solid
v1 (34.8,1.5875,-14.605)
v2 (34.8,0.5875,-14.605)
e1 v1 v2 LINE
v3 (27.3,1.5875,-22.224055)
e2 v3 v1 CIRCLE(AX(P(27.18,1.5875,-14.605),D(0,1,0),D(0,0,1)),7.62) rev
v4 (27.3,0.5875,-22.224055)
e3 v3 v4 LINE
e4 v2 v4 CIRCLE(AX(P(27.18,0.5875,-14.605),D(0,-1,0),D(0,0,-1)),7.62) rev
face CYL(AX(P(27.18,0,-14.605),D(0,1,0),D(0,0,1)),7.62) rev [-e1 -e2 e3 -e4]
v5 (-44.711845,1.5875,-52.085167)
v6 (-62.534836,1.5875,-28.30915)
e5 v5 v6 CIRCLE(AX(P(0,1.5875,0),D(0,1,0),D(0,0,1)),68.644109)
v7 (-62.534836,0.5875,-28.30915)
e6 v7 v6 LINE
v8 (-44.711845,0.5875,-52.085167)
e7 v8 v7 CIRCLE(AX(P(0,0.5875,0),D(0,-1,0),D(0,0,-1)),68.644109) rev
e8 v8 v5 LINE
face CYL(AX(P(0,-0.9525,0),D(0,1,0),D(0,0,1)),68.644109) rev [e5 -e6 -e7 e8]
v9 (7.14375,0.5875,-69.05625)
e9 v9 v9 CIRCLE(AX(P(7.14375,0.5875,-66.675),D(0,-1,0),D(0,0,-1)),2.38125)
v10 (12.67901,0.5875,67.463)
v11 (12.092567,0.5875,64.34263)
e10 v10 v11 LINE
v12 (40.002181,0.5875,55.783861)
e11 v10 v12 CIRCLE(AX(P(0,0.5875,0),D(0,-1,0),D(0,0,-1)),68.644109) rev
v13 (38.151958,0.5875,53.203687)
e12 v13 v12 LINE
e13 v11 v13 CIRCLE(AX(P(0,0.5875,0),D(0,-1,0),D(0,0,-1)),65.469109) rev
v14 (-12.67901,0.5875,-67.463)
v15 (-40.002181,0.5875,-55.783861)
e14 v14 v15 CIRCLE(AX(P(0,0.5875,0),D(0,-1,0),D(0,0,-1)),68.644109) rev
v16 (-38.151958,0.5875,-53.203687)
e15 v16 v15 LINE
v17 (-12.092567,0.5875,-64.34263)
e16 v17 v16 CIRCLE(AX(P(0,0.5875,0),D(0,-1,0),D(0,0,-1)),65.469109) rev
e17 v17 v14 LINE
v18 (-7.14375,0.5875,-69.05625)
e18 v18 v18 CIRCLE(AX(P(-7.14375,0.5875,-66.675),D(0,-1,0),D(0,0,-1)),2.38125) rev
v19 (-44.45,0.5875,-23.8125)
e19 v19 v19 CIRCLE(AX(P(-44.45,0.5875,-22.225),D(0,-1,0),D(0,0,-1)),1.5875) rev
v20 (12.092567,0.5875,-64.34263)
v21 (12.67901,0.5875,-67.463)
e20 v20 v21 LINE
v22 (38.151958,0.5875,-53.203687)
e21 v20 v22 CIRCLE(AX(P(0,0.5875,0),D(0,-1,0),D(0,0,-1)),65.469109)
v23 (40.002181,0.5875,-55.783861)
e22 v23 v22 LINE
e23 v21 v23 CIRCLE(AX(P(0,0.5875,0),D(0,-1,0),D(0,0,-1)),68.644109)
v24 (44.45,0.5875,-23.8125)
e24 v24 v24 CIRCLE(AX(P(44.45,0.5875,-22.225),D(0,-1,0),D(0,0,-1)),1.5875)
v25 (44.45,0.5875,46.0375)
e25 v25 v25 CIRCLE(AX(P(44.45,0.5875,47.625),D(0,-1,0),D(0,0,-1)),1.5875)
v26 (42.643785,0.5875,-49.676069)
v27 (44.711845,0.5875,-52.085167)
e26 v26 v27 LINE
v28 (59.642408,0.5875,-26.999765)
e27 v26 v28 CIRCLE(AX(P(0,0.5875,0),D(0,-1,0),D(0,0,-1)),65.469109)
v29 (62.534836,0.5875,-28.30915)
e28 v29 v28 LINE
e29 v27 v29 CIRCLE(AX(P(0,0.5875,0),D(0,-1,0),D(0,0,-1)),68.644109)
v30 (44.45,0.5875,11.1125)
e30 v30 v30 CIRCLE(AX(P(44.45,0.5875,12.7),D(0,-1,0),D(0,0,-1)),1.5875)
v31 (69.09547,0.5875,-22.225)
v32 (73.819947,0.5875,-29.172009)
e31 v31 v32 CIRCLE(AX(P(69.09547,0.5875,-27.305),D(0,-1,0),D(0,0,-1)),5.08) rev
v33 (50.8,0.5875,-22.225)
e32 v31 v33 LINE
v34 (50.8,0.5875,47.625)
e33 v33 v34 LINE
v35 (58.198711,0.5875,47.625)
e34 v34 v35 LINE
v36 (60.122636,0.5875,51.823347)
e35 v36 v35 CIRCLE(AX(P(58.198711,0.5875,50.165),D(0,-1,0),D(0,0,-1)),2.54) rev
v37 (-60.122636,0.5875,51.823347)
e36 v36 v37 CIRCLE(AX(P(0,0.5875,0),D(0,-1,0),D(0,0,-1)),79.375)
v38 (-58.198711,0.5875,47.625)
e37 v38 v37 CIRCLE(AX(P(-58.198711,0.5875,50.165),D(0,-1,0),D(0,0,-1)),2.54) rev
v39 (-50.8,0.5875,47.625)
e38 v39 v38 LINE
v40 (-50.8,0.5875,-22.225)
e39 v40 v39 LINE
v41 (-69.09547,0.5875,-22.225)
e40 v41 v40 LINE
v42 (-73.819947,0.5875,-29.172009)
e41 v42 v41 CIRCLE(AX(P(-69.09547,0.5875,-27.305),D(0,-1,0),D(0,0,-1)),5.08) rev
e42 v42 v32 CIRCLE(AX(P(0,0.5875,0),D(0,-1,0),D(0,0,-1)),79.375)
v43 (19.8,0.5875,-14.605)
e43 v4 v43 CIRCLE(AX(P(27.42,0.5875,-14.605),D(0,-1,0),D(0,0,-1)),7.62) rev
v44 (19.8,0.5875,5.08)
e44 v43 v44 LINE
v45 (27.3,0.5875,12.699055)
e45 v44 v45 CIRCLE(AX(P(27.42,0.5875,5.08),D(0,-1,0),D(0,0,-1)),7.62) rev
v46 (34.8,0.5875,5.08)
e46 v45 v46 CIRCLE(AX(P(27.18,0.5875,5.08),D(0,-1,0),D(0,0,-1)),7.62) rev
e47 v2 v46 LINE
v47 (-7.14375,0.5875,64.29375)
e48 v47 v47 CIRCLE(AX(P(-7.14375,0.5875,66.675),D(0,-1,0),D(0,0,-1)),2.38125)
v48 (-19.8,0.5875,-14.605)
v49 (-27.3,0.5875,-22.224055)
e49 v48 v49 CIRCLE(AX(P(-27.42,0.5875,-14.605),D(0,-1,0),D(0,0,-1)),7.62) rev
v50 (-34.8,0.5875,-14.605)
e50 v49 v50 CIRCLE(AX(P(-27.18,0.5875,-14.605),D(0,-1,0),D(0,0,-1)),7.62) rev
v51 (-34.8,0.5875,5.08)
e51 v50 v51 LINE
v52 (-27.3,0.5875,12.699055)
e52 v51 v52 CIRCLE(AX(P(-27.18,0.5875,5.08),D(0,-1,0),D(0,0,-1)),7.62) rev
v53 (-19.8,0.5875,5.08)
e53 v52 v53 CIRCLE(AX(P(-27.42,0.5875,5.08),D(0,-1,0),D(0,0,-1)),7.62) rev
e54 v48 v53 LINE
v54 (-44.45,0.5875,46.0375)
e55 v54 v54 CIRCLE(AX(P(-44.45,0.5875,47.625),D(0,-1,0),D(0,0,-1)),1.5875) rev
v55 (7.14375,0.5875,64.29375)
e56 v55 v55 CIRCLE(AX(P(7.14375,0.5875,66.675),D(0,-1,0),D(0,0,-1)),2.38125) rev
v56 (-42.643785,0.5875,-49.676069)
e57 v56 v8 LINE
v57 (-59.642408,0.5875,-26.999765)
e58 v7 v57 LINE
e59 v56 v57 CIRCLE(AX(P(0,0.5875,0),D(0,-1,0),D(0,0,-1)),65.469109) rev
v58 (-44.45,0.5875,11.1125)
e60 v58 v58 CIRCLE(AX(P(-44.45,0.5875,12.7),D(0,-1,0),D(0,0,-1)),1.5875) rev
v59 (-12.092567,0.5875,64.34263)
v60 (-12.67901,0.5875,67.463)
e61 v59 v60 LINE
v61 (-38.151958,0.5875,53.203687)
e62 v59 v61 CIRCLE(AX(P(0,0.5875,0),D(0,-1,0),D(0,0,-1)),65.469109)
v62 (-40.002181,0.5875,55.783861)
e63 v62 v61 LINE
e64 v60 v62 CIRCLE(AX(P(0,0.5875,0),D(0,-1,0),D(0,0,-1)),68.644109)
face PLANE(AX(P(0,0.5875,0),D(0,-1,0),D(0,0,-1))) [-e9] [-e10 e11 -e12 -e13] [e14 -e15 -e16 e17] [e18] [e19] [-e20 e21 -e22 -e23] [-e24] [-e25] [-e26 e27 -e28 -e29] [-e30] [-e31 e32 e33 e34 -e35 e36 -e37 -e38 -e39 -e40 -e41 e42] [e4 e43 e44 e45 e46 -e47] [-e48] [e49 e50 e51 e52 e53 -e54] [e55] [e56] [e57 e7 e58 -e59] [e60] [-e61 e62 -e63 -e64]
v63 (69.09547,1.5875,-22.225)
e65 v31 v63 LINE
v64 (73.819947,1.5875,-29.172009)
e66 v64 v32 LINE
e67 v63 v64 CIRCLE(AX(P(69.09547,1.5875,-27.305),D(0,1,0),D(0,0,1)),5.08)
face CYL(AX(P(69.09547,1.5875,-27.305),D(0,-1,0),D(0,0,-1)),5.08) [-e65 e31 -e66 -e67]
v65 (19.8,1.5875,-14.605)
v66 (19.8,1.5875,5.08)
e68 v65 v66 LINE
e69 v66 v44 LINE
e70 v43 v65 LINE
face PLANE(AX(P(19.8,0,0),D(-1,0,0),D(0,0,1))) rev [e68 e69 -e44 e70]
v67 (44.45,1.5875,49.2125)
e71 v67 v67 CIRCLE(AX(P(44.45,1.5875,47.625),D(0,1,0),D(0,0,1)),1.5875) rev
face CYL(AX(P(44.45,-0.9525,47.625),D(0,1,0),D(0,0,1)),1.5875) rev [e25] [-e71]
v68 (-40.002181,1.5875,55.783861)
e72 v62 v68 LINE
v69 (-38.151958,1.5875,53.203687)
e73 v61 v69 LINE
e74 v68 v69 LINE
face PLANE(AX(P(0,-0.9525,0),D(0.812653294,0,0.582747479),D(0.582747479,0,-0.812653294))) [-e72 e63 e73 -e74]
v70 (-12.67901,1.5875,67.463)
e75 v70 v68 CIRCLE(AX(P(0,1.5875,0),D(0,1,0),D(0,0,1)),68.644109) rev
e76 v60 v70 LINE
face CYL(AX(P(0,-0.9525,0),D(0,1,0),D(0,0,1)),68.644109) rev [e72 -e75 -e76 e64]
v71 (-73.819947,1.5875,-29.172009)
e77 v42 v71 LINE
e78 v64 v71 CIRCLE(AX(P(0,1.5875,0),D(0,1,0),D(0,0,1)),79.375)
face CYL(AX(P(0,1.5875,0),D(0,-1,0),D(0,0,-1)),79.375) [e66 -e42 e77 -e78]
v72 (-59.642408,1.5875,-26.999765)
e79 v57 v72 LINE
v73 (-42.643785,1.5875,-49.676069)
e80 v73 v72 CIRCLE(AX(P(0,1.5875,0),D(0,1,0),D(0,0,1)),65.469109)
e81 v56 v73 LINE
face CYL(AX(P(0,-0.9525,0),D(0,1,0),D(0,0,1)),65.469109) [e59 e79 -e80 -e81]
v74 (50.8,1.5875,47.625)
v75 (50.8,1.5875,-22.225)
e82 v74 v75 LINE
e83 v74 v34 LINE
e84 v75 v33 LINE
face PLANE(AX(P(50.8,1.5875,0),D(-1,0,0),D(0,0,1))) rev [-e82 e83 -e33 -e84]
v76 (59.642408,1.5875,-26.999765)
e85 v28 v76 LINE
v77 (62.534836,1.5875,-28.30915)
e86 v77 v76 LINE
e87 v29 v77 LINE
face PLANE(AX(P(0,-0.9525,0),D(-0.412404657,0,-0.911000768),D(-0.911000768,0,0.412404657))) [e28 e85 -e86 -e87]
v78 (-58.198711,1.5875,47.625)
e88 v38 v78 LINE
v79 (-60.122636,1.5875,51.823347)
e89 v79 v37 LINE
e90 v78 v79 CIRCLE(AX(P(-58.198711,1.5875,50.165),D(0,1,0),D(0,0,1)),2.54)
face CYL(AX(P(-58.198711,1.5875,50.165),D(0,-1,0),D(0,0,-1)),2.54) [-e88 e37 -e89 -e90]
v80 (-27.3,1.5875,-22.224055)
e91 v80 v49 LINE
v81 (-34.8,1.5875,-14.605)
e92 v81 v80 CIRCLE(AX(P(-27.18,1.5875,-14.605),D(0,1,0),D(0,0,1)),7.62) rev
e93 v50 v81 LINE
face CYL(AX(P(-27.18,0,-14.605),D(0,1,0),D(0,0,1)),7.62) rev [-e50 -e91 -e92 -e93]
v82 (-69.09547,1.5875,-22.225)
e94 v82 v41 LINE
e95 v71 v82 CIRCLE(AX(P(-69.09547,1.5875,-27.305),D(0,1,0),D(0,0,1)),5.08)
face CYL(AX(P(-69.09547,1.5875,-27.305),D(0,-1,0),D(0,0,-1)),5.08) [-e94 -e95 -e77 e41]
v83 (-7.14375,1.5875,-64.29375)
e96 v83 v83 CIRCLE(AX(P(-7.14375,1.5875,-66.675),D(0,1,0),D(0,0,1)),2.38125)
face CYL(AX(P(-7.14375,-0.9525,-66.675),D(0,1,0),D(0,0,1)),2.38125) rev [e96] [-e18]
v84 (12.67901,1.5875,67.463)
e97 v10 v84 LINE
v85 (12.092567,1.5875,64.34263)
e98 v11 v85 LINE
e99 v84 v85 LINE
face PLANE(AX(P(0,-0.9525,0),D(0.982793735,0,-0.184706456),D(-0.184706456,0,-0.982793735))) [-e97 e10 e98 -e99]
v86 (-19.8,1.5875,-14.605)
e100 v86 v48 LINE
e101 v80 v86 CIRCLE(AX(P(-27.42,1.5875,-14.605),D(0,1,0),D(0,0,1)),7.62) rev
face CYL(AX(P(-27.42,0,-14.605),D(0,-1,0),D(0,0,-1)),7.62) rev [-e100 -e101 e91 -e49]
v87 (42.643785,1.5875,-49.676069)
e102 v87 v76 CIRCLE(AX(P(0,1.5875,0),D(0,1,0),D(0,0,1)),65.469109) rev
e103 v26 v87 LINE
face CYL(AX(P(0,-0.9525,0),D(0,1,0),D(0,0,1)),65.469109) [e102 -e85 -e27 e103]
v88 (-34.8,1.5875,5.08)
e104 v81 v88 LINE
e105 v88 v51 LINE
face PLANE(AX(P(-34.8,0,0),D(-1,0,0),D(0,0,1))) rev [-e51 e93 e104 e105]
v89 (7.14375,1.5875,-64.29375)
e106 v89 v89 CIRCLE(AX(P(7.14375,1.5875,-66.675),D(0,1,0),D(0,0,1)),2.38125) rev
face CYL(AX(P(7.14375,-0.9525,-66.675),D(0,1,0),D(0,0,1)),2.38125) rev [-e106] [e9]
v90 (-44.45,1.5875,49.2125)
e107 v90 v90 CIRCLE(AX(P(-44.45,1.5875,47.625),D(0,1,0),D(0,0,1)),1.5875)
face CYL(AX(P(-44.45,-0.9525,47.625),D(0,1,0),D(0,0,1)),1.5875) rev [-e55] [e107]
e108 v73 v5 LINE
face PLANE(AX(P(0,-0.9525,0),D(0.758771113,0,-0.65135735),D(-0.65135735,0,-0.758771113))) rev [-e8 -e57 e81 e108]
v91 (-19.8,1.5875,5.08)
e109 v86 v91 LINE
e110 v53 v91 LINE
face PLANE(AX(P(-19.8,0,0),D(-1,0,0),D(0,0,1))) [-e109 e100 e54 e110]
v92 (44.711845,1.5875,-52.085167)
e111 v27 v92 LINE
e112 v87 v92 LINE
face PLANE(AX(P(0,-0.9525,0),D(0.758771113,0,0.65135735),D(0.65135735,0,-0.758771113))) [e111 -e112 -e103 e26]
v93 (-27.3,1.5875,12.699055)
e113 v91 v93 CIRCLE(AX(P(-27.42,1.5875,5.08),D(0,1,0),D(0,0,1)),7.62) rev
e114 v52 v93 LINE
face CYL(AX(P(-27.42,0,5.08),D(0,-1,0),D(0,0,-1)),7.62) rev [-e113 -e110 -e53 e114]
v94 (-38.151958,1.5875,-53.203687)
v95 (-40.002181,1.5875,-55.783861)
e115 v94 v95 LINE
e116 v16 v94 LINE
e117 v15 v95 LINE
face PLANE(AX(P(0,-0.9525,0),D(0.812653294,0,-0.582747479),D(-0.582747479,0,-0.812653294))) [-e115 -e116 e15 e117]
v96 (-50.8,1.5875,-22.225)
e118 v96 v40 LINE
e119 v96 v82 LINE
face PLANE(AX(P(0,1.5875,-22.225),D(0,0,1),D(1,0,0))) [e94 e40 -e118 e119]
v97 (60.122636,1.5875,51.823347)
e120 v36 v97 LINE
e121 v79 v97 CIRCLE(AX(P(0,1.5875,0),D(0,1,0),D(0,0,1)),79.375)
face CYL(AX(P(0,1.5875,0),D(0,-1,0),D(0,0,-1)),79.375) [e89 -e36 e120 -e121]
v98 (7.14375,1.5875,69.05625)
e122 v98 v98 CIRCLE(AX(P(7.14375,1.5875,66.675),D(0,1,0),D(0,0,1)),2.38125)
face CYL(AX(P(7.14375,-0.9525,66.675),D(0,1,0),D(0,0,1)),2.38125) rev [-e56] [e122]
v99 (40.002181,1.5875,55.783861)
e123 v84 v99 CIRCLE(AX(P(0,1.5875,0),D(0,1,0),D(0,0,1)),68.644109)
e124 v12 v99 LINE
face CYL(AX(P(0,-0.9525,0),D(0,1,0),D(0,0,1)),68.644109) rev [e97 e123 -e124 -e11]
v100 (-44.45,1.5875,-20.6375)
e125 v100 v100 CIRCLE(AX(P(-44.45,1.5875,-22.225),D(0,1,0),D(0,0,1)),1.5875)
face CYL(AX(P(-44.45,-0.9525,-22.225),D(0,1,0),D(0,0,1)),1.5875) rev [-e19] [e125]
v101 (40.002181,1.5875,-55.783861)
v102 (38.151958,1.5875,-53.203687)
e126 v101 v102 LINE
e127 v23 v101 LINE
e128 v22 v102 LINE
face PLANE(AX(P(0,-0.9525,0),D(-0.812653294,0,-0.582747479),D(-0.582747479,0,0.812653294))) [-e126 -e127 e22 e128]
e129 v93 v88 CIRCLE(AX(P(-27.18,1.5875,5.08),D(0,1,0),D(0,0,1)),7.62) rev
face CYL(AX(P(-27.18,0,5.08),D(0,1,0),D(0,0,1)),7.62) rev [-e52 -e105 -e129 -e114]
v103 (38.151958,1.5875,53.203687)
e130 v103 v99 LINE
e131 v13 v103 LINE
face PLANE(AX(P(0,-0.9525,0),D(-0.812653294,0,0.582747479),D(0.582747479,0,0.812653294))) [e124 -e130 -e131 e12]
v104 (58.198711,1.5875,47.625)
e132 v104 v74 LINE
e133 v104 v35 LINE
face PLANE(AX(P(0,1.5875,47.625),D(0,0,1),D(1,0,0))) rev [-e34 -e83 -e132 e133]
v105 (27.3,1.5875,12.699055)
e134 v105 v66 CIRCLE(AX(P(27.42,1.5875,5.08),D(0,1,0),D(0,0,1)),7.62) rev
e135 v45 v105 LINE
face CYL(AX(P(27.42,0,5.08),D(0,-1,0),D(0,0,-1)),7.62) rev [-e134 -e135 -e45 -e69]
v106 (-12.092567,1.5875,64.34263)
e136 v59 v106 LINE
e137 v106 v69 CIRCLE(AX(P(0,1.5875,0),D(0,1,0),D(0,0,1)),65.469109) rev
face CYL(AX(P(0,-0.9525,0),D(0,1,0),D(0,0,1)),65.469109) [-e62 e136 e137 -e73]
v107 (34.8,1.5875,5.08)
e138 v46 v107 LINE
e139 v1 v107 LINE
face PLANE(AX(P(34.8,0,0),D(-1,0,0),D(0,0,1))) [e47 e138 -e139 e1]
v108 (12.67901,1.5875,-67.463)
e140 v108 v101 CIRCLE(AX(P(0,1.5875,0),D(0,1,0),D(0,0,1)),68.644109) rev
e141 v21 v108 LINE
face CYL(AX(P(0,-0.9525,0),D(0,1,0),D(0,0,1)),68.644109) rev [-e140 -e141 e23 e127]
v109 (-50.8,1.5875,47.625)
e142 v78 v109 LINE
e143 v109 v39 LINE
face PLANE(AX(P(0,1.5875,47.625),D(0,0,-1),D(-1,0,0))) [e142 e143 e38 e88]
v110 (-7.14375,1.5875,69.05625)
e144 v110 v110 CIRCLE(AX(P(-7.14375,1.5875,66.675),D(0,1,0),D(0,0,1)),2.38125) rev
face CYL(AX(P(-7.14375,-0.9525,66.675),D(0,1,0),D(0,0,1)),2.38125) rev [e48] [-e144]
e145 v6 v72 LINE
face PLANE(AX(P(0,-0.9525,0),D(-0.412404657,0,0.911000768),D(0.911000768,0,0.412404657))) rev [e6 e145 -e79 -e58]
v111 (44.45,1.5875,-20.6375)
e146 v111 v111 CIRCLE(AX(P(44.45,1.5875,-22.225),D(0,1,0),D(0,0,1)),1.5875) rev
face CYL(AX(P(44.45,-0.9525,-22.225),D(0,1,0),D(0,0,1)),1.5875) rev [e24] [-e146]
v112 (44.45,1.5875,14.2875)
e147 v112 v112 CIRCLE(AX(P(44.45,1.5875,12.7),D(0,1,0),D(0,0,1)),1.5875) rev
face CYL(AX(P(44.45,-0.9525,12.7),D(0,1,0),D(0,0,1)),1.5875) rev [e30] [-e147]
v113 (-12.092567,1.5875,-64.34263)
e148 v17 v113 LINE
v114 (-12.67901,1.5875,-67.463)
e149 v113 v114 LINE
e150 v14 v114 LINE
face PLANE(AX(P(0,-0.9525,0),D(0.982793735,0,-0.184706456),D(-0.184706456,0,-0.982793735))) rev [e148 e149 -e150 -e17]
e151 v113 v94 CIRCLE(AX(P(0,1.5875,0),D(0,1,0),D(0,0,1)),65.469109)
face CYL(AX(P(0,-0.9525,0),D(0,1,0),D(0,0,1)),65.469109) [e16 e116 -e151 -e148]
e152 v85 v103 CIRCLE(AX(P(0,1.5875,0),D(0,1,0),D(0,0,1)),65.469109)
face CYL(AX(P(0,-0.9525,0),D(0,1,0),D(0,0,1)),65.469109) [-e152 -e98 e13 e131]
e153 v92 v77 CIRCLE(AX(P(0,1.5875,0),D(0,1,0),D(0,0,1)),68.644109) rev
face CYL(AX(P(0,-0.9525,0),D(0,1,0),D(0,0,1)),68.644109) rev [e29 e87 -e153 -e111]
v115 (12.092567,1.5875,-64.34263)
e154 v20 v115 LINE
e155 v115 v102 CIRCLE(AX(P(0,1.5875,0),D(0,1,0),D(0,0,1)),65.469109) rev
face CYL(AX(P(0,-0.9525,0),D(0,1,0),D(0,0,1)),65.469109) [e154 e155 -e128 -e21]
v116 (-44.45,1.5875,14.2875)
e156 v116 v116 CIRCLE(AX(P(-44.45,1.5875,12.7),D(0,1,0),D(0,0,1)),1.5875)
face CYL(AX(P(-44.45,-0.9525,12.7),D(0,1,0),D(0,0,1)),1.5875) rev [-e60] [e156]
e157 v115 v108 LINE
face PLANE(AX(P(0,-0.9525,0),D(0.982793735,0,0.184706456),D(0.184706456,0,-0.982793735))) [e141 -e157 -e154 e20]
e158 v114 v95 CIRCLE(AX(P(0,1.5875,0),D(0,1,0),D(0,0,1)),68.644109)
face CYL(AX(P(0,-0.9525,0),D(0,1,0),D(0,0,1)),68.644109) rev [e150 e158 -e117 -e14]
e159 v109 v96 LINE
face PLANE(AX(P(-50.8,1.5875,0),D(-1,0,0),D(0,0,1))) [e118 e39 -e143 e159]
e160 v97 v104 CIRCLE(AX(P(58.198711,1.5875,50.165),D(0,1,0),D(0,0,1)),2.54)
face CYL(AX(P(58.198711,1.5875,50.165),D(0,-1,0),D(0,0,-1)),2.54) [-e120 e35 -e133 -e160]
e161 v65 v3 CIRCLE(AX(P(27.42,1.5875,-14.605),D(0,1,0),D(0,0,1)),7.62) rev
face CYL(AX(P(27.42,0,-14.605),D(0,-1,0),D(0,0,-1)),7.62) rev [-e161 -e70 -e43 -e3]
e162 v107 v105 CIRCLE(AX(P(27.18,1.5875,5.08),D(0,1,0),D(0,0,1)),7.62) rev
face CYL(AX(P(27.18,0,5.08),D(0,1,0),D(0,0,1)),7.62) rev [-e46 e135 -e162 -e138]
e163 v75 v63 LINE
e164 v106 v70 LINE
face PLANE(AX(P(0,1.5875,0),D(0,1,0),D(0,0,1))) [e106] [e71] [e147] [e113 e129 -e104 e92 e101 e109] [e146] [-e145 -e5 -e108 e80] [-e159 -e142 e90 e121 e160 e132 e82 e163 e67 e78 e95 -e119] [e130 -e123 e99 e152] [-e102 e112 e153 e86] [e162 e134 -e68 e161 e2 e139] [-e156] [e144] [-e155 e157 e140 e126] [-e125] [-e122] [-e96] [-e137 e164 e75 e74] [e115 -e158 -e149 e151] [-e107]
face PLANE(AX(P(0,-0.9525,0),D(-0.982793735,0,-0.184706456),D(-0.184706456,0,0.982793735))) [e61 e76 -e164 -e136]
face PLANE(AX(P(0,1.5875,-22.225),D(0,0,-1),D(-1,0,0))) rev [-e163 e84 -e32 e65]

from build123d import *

# Parameters (mm, degrees)
SKETCH1_R           = 1.5875
BOSS_EXTRUDE5_DEPTH = 1.5875
FILLET2_R           = 2.54
FILLET3_R           = 2.54
FILLET4_R           = 5.08
CUT_EXTRUDE1_START  = -2.54
SKETCH2_R           = 2.38125
SKETCH2_R_2         = 1.5875
CUT_EXTRUDE1_DEPTH  = 2.54
SKETCH3_R           = 1.5875
CUT_EXTRUDE2_DEPTH  = 2.54
CUT_EXTRUDE3_DEPTH  = 2.54
SKETCH5_W           = 15
SKETCH5_H           = 34.925
CUT_EXTRUDE4_DEPTH  = 109.650407999
FILLET5_R           = 7.62
FILLET6_R           = 7.62
SKETCH6_R           = 79.375
CUT_EXTRUDE5_DEPTH  = 0.5875


with BuildPart() as part:
    # Sketch1 → Boss-Extrude5 (new body)
    with BuildSketch(Plane(origin=(0, 0, 0), x_dir=(1, 0, 0), z_dir=(0, 1, 0))):
        with BuildLine():
            ThreePointArc((-63.5, -47.625), (-35.497579143, -70.995158286), (0, -79.375))
            ThreePointArc((0, -79.375), (35.497579143, -70.995158286), (63.5, -47.625))
            Line((63.5, -47.625), (50.8, -47.625))
            Line((50.8, -47.625), (50.8, 22.225))
            Line((50.8, 22.225), (76.2, 22.225))
            ThreePointArc((76.2, 22.225), (0, 79.375), (-76.2, 22.225))
            Line((-76.2, 22.225), (-50.8, 22.225))
            Line((-50.8, 22.225), (-50.8, -47.625))
            Line((-50.8, -47.625), (-63.5, -47.625))
        make_face()
        with Locations(Location((-7.14375, -66.675, 0), (0, 0, 270))):
            Circle(SKETCH1_R, mode=Mode.SUBTRACT)
        with BuildLine():
            ThreePointArc((8.73125, -66.675), (7.14375, -68.2625), (5.55625, -66.675))
            ThreePointArc((5.55625, -66.675), (7.14375, -65.0875), (8.73125, -66.675))
        make_face(mode=Mode.SUBTRACT)
        with Locations(Location((-7.14375, 66.675, 0), (0, 0, 270))):
            Circle(SKETCH1_R, mode=Mode.SUBTRACT)
        with Locations(Location((7.14375, 66.675, 0), (0, 0, 270))):
            Circle(SKETCH1_R, mode=Mode.SUBTRACT)
    extrude(amount=BOSS_EXTRUDE5_DEPTH)

    # Fillet2
    fillet2_edges = [part.edges().sort_by_distance(p)[0] for p in [
        (-63.5, 0.79375, 47.625),
    ]]
    fillet(fillet2_edges, radius=FILLET2_R)

    # Fillet3
    fillet3_edges = [part.edges().sort_by_distance(p)[0] for p in [
        (63.5, 0.79375, 47.625),
    ]]
    fillet(fillet3_edges, radius=FILLET3_R)

    # Fillet4
    fillet4_edges = [part.edges().sort_by_distance(p)[0] for p in [
        (-76.2, 0.79375, -22.225),
        (76.2, 0.79375, -22.225),
    ]]
    fillet(fillet4_edges, radius=FILLET4_R)

    # Sketch2 → Cut-Extrude1 (cut)
    # profile 1 of 10: a face of its own
    with BuildSketch(Plane(origin=(0, 1.5875, 0), x_dir=(1, 0, 0), z_dir=(0, 1, 0)).offset(CUT_EXTRUDE1_START)):
        with BuildLine():
            Line((-61.088622125, 27.654457796), (-59.642408406, 26.999765402))
            ThreePointArc((-59.642408406, 26.999765402), (-52.384826382, 39.268743005), (-42.643785254, 49.676068599))
            Line((-42.643785254, 49.676068599), (-43.677815048, 50.880617741))
            Line((-43.677815048, 50.880617741), (-44.711844841, 52.085166883))
            ThreePointArc((-44.711844841, 52.085166883), (-54.925289002, 41.173126022), (-62.534835843, 28.309150189))
            Line((-62.534835843, 28.309150189), (-61.088622125, 27.654457796))
        make_face()
    # profile 2 of 10: a face of its own
    with BuildSketch(Plane(origin=(0, 1.5875, 0), x_dir=(1, 0, 0), z_dir=(0, 1, 0)).offset(CUT_EXTRUDE1_START)):
        with BuildLine():
            Line((-39.077069744, 54.493774041), (-38.151958122, 53.203686937))
            ThreePointArc((-38.151958122, 53.203686937), (-25.732218917, 60.200142208), (-12.092567045, 64.342629994))
            Line((-12.092567045, 64.342629994), (-12.385788543, 65.902815048))
            Line((-12.385788543, 65.902815048), (-12.679010041, 67.463000102))
            ThreePointArc((-12.679010041, 67.463000102), (-26.980132574, 63.119617589), (-40.002181367, 55.783861145))
            Line((-40.002181367, 55.783861145), (-39.077069744, 54.493774041))
        make_face()
    # profile 3 of 10: a face of its own
    with BuildSketch(Plane(origin=(0, 1.5875, 0), x_dir=(1, 0, 0), z_dir=(0, 1, 0)).offset(CUT_EXTRUDE1_START)):
        with Locations(Location((-7.14375, 66.675, 0), (0, 0, 270))):
            Circle(SKETCH2_R)
        with Locations((-7.14375, 66.675)):
            Circle(SKETCH2_R_2, mode=Mode.SUBTRACT)
    # profile 4 of 10: a face of its own
    with BuildSketch(Plane(origin=(0, 1.5875, 0), x_dir=(1, 0, 0), z_dir=(0, 1, 0)).offset(CUT_EXTRUDE1_START)):
        with Locations(Location((7.14375, 66.675, 0), (0, 0, 270))):
            Circle(SKETCH2_R)
        with Locations((7.14375, 66.675)):
            Circle(SKETCH2_R_2, mode=Mode.SUBTRACT)
    # profile 5 of 10: a face of its own
    with BuildSketch(Plane(origin=(0, 1.5875, 0), x_dir=(1, 0, 0), z_dir=(0, 1, 0)).offset(CUT_EXTRUDE1_START)):
        with BuildLine():
            ThreePointArc((12.679010041, 67.463000102), (26.980132574, 63.119617589), (40.002181367, 55.783861145))
            Line((40.002181367, 55.783861145), (39.077069744, 54.493774041))
            Line((39.077069744, 54.493774041), (38.151958122, 53.203686937))
            ThreePointArc((38.151958122, 53.203686937), (25.732218917, 60.200142208), (12.092567045, 64.342629994))
            Line((12.092567045, 64.342629994), (12.385788543, 65.902815048))
            Line((12.385788543, 65.902815048), (12.679010041, 67.463000102))
        make_face()
    # profile 6 of 10: a face of its own
    with BuildSketch(Plane(origin=(0, 1.5875, 0), x_dir=(1, 0, 0), z_dir=(0, 1, 0)).offset(CUT_EXTRUDE1_START)):
        with BuildLine():
            ThreePointArc((44.711844841, 52.085166883), (54.925289002, 41.173126022), (62.534835843, 28.309150189))
            Line((62.534835843, 28.309150189), (59.642408406, 26.999765402))
            ThreePointArc((59.642408406, 26.999765402), (52.384826382, 39.268743005), (42.643785254, 49.676068599))
            Line((42.643785254, 49.676068599), (43.677815048, 50.880617741))
            Line((43.677815048, 50.880617741), (44.711844841, 52.085166883))
        make_face()
    # profile 7 of 10: a face of its own
    with BuildSketch(Plane(origin=(0, 1.5875, 0), x_dir=(1, 0, 0), z_dir=(0, 1, 0)).offset(CUT_EXTRUDE1_START)):
        with BuildLine():
            ThreePointArc((-12.679010041, -67.463000102), (-26.980132574, -63.119617589), (-40.002181367, -55.783861145))
            Line((-40.002181367, -55.783861145), (-39.077069744, -54.493774041))
            Line((-39.077069744, -54.493774041), (-38.151958122, -53.203686937))
            ThreePointArc((-38.151958122, -53.203686937), (-25.732218917, -60.200142208), (-12.092567045, -64.342629994))
            Line((-12.092567045, -64.342629994), (-12.385788543, -65.902815048))
            Line((-12.385788543, -65.902815048), (-12.679010041, -67.463000102))
        make_face()
    # profile 8 of 10: a face of its own
    with BuildSketch(Plane(origin=(0, 1.5875, 0), x_dir=(1, 0, 0), z_dir=(0, 1, 0)).offset(CUT_EXTRUDE1_START)):
        with Locations(Location((-7.14375, -66.675, 0), (0, 0, 270))):
            Circle(SKETCH2_R)
        with Locations((-7.14375, -66.675)):
            Circle(SKETCH2_R_2, mode=Mode.SUBTRACT)
    # profile 9 of 10: a face of its own
    with BuildSketch(Plane(origin=(0, 1.5875, 0), x_dir=(1, 0, 0), z_dir=(0, 1, 0)).offset(CUT_EXTRUDE1_START)):
        with Locations(Location((7.14375, -66.675, 0), (0, 0, 270))):
            Circle(SKETCH2_R)
        with Locations((7.14375, -66.675)):
            Circle(SKETCH2_R_2, mode=Mode.SUBTRACT)
    # profile 10 of 10: a face of its own
    with BuildSketch(Plane(origin=(0, 1.5875, 0), x_dir=(1, 0, 0), z_dir=(0, 1, 0)).offset(CUT_EXTRUDE1_START)):
        with BuildLine():
            ThreePointArc((12.092567045, -64.342629994), (25.732218917, -60.200142208), (38.151958122, -53.203686937))
            Line((38.151958122, -53.203686937), (39.077069744, -54.493774041))
            Line((39.077069744, -54.493774041), (40.002181367, -55.783861145))
            ThreePointArc((40.002181367, -55.783861145), (26.980132574, -63.119617589), (12.679010041, -67.463000102))
            Line((12.679010041, -67.463000102), (12.385788543, -65.902815048))
            Line((12.385788543, -65.902815048), (12.092567045, -64.342629994))
        make_face()
    extrude(amount=CUT_EXTRUDE1_DEPTH, mode=Mode.SUBTRACT)

    # Sketch3 → Cut-Extrude2 (cut)
    with BuildSketch(Plane(origin=(0, 1.5875, 0), x_dir=(1, 0, 0), z_dir=(0, 1, 0))):
        with Locations(Location((-44.45, -47.625, 0), (0, 0, 270))):
            Circle(SKETCH3_R)
        with Locations(Location((-44.45, 22.225, 0), (0, 0, 270))):
            Circle(SKETCH3_R)
        with Locations(Location((44.45, 22.225, 0), (0, 0, 270))):
            Circle(SKETCH3_R)
        with Locations(Location((44.45, -47.625, 0), (0, 0, 270))):
            Circle(SKETCH3_R)
    extrude(amount=-CUT_EXTRUDE2_DEPTH, mode=Mode.SUBTRACT)

    # Sketch4 → Cut-Extrude3 (cut)
    with BuildSketch(Plane(origin=(0, 1.5875, 0), x_dir=(1, 0, 0), z_dir=(0, 1, 0))):
        with BuildLine():
            ThreePointArc((-44.45, -11.1125), (-46.0375, -12.7), (-44.45, -14.2875))
            Line((-44.45, -14.2875), (-44.45, -11.1125))
        make_face()
        with BuildLine():
            Line((-44.45, -11.1125), (-44.45, -14.2875))
            ThreePointArc((-44.45, -14.2875), (-43.327467985, -13.822532015), (-42.8625, -12.7))
            ThreePointArc((-42.8625, -12.7), (-43.327467985, -11.577467985), (-44.45, -11.1125))
        make_face()
        with BuildLine():
            ThreePointArc((44.45, -11.1125), (42.8625, -12.7), (44.45, -14.2875))
            Line((44.45, -14.2875), (44.45, -11.1125))
        make_face()
        with BuildLine():
            Line((44.45, -11.1125), (44.45, -14.2875))
            ThreePointArc((44.45, -14.2875), (45.572532015, -13.822532015), (46.0375, -12.7))
            ThreePointArc((46.0375, -12.7), (45.572532015, -11.577467985), (44.45, -11.1125))
        make_face()
    extrude(amount=-CUT_EXTRUDE3_DEPTH, mode=Mode.SUBTRACT)

    # Sketch5 → Cut-Extrude4 (cut, through all)
    with BuildSketch(Plane(origin=(0, 1.5875, 0), x_dir=(1, 0, 0), z_dir=(0, 1, 0))):
        with Locations((-27.3, 4.7625)):
            Rectangle(SKETCH5_W, SKETCH5_H)
        with Locations((27.3, 4.7625)):
            Rectangle(SKETCH5_W, SKETCH5_H)
    extrude(amount=-CUT_EXTRUDE4_DEPTH, mode=Mode.SUBTRACT)

    # Fillet5
    # the kernel refuses this fillet: 7.62 mm, written as the material it adds along each edge
    with BuildSketch(Plane(origin=(-19.8, 1.5875, 12.7), x_dir=(0, 0, -1), z_dir=(0, -1, 0))) as fillet5_piece_1:
        with BuildLine():
            CenterArc((FILLET5_R, -FILLET5_R), FILLET5_R, 90, 90)
            Line((0, -FILLET5_R), (0, 0))
            Line((0, 0), (FILLET5_R, 0))
        make_face()
    extrude(amount=1.5875)
    with BuildSketch(Plane(origin=(-34.8, 1.5875, 12.7), x_dir=(0, 0, -1), z_dir=(0, -1, 0)), Plane(origin=(-19.8, 1.5875, -22.225), x_dir=(0, 0, 1), z_dir=(0, -1, 0)), Plane(origin=(-34.8, 1.5875, -22.225), x_dir=(1, 0, 0), z_dir=(0, -1, 0))) as fillet5_piece_2:
        with BuildLine():
            CenterArc((FILLET5_R, FILLET5_R), FILLET5_R, 180, 90)
            Line((0, FILLET5_R), (0, 0))
            Line((0, 0), (FILLET5_R, 0))
        make_face()
    extrude(amount=1.5875)

    # Fillet6
    # the kernel refuses this fillet: 7.62 mm, written as the material it adds along each edge
    with BuildSketch(Plane(origin=(34.8, 1.5875, 12.7), x_dir=(0, 0, -1), z_dir=(0, -1, 0)), Plane(origin=(34.8, 1.5875, -22.225), x_dir=(-1, 0, 0), z_dir=(0, -1, 0))) as fillet6_piece_1:
        with BuildLine():
            CenterArc((FILLET6_R, -FILLET6_R), FILLET6_R, 90, 90)
            Line((0, -FILLET6_R), (0, 0))
            Line((0, 0), (FILLET6_R, 0))
        make_face()
    extrude(amount=1.5875)
    with BuildSketch(Plane(origin=(19.8, 1.5875, -22.225), x_dir=(1, 0, 0), z_dir=(0, -1, 0)), Plane(origin=(19.8, 1.5875, 12.7), x_dir=(0, 0, -1), z_dir=(0, -1, 0))) as fillet6_piece_2:
        with BuildLine():
            CenterArc((FILLET6_R, FILLET6_R), FILLET6_R, 180, 90)
            Line((0, FILLET6_R), (0, 0))
            Line((0, 0), (FILLET6_R, 0))
        make_face()
    extrude(amount=1.5875)

    # Sketch6 → Cut-Extrude5 (cut)
    with BuildSketch(Plane(origin=(0, 0, 0), x_dir=(-1, 0, 0), z_dir=(0, -1, 0))):
        Circle(SKETCH6_R)
    extrude(amount=-CUT_EXTRUDE5_DEPTH, mode=Mode.SUBTRACT)


solid = part.part
